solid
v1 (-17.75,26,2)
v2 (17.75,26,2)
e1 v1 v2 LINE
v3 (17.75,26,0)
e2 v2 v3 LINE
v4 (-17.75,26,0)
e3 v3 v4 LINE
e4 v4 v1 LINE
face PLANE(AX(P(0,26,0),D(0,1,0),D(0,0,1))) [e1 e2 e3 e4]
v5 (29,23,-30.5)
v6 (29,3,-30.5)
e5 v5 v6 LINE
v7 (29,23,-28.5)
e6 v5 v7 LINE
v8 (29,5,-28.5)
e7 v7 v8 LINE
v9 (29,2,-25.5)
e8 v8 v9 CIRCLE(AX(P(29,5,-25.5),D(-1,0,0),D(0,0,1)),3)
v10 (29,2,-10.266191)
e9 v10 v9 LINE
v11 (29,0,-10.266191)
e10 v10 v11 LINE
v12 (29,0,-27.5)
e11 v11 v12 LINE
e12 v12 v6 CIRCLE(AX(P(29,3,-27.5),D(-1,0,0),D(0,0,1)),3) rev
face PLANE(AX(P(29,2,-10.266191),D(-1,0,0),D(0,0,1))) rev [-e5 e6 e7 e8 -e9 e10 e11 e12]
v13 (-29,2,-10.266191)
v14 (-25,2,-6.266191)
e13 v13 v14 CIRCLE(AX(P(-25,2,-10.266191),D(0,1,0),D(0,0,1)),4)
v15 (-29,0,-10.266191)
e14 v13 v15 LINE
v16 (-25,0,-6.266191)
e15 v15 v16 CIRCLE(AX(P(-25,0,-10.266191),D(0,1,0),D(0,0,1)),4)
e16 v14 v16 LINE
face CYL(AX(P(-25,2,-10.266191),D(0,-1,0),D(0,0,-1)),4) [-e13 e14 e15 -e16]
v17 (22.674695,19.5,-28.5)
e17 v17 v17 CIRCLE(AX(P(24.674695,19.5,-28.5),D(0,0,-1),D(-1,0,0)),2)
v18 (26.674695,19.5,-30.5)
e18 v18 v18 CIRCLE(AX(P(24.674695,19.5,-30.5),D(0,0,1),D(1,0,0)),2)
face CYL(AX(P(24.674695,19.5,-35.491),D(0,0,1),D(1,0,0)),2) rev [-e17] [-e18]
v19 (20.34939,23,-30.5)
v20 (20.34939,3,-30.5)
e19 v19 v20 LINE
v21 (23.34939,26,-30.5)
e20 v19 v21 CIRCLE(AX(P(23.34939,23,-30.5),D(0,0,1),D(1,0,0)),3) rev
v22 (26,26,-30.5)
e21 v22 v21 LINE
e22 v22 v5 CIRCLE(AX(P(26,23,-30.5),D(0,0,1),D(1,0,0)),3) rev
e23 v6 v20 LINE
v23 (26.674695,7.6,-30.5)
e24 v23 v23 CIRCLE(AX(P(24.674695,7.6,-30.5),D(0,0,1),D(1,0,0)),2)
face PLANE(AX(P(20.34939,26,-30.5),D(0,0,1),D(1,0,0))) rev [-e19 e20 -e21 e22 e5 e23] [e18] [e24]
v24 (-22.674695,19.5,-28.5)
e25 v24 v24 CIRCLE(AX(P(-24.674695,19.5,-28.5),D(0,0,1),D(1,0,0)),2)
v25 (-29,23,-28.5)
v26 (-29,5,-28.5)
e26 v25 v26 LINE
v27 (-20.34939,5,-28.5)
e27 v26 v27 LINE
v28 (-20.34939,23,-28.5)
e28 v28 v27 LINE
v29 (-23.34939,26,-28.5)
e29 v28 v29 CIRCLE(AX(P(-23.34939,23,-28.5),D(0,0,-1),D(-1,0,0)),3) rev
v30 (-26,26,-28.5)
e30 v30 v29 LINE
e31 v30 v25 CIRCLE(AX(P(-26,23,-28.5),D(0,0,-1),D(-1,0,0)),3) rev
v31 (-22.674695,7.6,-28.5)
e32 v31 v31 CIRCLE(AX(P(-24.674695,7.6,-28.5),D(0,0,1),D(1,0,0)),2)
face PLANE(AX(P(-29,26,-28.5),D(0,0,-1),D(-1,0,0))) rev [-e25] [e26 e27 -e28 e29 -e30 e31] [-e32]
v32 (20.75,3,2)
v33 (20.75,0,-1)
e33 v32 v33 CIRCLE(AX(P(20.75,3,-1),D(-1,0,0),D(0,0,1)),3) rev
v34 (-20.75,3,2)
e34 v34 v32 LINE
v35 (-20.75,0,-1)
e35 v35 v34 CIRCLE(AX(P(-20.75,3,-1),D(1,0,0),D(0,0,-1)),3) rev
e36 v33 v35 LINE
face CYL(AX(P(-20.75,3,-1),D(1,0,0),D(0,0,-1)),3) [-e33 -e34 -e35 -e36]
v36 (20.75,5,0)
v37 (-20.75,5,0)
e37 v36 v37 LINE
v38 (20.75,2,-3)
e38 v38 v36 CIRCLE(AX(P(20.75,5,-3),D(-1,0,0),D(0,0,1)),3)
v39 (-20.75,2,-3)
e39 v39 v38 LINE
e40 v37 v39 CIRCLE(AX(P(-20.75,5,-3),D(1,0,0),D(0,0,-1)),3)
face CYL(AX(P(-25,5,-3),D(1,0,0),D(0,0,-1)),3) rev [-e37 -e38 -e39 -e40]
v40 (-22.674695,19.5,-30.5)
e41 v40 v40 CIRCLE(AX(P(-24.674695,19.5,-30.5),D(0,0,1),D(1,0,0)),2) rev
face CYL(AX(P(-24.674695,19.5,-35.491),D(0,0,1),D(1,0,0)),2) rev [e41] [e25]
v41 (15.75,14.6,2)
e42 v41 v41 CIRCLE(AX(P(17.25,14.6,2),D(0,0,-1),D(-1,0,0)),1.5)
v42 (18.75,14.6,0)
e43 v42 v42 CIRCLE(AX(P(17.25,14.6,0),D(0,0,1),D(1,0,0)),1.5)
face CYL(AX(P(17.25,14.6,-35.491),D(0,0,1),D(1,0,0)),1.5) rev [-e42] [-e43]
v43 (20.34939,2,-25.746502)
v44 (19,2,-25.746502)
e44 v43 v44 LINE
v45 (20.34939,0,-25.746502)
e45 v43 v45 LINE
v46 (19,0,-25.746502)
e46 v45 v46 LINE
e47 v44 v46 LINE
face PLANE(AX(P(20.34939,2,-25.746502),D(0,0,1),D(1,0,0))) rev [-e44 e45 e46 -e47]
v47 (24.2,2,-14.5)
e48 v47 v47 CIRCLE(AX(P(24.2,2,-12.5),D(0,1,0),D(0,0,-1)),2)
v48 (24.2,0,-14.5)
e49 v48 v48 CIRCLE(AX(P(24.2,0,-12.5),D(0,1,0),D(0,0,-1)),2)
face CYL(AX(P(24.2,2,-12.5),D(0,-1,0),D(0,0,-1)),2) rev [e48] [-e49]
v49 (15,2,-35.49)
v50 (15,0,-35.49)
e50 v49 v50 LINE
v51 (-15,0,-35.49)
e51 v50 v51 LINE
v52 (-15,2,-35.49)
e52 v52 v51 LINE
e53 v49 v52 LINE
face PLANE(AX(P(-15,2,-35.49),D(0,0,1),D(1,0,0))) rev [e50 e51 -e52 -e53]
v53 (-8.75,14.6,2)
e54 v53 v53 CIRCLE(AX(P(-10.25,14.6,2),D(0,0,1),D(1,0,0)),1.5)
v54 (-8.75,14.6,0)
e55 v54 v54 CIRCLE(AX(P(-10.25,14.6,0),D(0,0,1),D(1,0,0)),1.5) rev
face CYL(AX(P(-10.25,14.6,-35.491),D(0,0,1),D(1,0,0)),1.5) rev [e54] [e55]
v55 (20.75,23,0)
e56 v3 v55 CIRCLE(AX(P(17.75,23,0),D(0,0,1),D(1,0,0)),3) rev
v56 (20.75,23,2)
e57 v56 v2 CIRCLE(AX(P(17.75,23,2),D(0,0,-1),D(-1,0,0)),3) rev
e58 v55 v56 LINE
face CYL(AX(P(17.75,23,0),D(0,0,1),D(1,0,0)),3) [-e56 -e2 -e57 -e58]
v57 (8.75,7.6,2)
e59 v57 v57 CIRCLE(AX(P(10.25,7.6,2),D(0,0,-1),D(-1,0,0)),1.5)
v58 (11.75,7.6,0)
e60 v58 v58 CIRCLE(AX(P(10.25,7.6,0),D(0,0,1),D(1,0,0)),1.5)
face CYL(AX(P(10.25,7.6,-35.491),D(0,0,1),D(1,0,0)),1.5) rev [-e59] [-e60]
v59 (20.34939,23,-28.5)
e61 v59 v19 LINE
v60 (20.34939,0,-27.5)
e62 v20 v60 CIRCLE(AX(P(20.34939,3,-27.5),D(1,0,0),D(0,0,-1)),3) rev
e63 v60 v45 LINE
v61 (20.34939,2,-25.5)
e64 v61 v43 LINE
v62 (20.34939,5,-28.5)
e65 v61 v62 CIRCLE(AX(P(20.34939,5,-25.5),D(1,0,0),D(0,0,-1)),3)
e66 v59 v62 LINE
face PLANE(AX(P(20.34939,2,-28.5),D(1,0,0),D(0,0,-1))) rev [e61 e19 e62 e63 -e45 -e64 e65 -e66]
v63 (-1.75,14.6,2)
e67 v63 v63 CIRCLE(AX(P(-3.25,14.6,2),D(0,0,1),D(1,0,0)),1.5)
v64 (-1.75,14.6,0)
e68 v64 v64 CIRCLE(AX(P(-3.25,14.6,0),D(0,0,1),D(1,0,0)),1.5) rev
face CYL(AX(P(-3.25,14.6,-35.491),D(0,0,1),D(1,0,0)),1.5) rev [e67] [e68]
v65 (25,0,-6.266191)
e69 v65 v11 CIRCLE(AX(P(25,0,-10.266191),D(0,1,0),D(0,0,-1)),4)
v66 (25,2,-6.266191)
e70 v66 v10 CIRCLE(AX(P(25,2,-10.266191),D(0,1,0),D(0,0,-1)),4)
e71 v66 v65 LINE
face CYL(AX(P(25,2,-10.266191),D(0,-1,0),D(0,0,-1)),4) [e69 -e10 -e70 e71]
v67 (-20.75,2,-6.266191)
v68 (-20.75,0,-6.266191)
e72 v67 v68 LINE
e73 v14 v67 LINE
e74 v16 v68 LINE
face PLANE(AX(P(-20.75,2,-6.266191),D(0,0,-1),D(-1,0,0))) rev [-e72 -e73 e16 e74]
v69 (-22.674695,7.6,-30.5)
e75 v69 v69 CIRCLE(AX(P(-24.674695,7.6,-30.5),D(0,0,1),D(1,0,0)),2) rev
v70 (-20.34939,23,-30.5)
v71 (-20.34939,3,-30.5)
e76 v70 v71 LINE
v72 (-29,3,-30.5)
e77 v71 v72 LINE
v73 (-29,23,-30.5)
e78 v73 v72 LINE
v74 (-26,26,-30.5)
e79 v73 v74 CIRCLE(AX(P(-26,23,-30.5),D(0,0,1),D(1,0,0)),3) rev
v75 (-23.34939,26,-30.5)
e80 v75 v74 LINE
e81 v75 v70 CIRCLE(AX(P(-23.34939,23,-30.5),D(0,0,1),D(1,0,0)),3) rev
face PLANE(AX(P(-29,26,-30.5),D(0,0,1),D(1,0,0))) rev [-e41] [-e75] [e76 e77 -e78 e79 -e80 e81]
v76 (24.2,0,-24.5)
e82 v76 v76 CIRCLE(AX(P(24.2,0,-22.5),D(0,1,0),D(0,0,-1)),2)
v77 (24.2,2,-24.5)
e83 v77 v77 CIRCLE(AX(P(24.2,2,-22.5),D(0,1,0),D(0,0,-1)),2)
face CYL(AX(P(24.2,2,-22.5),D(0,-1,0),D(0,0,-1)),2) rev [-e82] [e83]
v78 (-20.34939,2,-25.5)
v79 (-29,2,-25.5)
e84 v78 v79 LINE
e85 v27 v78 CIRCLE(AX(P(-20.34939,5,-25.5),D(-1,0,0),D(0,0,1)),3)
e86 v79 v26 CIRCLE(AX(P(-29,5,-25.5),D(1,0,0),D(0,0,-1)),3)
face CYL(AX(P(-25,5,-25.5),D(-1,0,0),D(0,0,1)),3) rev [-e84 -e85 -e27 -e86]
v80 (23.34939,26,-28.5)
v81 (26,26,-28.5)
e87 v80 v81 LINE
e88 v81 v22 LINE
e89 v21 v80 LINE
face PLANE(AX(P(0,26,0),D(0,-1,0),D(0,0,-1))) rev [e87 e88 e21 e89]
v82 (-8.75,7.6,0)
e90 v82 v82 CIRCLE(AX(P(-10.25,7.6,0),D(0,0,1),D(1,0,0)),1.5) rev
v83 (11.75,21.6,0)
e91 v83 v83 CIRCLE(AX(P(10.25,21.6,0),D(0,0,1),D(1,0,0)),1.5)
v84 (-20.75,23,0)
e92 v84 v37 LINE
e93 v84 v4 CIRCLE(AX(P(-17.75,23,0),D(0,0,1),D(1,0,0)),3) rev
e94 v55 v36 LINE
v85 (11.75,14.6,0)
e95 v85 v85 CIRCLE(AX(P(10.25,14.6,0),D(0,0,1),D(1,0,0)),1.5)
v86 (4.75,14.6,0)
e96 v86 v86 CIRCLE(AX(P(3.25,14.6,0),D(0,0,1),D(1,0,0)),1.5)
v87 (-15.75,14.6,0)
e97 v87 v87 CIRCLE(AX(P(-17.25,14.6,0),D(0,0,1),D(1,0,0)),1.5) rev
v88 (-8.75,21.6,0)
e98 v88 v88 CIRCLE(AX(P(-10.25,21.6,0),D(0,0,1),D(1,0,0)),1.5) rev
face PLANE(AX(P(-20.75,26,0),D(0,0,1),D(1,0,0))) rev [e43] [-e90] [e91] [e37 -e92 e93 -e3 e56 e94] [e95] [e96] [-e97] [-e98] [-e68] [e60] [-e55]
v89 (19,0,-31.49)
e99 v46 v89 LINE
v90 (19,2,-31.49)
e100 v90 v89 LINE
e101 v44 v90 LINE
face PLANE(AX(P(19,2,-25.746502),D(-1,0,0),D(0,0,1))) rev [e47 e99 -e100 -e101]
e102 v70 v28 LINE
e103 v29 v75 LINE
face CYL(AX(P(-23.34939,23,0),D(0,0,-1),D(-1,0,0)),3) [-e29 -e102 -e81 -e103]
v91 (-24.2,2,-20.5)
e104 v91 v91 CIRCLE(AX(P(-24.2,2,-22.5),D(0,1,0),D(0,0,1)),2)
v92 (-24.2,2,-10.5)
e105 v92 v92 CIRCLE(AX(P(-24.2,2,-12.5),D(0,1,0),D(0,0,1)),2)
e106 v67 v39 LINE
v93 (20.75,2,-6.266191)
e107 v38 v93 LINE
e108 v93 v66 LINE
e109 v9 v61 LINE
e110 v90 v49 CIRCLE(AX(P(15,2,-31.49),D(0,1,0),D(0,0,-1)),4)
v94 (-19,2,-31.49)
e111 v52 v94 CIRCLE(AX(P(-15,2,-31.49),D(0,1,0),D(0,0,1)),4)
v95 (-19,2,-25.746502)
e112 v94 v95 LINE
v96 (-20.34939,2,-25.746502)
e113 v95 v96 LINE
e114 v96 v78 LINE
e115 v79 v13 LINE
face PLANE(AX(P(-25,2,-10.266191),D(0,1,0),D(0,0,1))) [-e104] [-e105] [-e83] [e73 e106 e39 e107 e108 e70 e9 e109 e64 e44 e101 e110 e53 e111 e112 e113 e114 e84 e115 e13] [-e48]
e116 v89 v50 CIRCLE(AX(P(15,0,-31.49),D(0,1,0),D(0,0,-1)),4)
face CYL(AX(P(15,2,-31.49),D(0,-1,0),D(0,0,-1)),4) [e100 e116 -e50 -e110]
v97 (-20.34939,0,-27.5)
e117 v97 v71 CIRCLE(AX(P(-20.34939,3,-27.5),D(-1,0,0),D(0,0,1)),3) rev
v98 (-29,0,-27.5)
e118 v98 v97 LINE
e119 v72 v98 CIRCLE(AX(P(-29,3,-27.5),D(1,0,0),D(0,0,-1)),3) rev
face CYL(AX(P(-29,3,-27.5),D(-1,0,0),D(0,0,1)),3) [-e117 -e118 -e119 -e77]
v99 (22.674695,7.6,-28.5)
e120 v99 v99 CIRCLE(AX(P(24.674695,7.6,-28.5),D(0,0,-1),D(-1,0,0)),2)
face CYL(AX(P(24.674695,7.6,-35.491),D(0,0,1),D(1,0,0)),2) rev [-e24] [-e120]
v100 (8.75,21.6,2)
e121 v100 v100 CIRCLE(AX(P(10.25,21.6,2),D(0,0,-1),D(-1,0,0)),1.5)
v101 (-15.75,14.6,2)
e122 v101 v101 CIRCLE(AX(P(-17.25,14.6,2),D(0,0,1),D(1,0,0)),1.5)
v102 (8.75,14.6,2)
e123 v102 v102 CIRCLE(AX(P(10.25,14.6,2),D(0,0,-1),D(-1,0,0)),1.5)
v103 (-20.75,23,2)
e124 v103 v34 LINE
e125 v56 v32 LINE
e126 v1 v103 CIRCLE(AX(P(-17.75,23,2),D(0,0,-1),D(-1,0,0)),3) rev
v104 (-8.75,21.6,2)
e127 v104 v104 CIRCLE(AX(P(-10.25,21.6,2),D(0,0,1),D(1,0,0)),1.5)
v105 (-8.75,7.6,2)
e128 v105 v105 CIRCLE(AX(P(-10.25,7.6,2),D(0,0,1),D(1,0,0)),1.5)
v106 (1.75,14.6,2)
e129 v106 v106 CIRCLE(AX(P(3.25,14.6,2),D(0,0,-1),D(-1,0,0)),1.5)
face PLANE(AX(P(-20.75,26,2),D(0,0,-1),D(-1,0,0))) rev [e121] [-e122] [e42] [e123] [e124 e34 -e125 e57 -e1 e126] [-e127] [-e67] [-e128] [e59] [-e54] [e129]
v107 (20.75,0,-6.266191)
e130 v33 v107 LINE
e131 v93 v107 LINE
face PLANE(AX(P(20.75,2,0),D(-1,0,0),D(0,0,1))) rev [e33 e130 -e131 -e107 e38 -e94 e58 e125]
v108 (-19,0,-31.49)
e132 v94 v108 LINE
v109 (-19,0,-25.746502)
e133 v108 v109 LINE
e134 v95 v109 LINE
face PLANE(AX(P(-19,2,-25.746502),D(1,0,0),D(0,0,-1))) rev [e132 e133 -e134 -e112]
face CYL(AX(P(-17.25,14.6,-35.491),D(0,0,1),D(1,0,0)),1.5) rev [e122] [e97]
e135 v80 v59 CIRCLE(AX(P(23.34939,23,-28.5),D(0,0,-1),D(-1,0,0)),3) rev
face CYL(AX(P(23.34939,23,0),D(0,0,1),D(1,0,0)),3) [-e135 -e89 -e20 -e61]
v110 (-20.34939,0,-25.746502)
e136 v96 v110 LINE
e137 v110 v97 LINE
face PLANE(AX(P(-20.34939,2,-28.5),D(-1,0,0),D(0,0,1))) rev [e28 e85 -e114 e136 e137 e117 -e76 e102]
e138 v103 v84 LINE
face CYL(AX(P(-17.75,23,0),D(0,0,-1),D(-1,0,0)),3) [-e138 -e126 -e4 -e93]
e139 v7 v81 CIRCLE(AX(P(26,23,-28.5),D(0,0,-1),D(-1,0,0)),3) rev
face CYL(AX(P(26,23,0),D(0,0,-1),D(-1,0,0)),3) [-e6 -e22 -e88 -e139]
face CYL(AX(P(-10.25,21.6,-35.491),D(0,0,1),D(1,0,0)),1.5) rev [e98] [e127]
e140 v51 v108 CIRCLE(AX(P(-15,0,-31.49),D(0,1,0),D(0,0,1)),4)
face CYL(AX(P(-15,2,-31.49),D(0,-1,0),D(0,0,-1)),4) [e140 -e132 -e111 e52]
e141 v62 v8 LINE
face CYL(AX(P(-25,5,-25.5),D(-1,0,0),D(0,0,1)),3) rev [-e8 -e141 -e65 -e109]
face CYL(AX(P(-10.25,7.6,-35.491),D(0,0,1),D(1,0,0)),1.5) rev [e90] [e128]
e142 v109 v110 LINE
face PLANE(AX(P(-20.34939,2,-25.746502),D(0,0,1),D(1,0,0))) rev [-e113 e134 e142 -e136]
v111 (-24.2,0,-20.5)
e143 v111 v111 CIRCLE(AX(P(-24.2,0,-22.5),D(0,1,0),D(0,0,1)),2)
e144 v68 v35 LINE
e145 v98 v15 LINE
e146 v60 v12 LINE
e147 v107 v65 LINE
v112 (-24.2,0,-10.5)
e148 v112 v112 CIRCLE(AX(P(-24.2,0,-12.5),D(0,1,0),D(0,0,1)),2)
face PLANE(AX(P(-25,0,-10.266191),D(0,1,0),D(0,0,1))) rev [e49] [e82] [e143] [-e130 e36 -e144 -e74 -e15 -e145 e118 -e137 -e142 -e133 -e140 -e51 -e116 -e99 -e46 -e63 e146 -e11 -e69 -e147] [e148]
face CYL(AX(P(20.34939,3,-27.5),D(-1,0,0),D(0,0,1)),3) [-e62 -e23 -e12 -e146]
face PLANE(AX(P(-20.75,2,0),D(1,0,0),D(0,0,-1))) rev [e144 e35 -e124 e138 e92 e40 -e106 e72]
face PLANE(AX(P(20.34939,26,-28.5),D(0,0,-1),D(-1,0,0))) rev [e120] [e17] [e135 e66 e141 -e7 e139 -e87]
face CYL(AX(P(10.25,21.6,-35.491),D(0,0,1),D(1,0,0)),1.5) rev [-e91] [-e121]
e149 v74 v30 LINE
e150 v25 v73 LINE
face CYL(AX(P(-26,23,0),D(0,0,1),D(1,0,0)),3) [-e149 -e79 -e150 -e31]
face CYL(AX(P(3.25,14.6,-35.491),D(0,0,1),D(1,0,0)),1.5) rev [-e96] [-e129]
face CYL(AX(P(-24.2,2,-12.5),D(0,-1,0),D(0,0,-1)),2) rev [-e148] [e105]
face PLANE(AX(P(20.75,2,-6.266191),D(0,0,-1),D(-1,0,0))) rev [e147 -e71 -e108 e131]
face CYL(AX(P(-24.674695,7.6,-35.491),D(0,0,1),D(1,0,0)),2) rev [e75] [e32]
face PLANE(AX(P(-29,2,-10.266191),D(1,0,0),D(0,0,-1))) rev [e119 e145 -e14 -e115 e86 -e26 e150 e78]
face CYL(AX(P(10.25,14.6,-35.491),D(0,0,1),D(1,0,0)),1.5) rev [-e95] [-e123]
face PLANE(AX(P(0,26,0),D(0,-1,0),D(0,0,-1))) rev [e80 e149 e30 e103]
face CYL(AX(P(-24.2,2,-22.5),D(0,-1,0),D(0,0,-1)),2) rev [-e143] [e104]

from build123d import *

# Parameters (mm, degrees)
SKETCH_1_R          = 2
EXTRUDE_1_DEPTH     = 2
SKETCH_3_W          = 8.650610314
SKETCH_3_H          = 2
SKETCH_3_W_2        = 41.5
EXTRUDE_2_DEPTH     = 26
CUT_EXTRUDE_1_REACH = 51.47
SKETCH_4_R          = 2
CUT_EXTRUDE_2_REACH = 56.06
SKETCH_5_R          = 1.5
FILLET_1_R          = 3


with BuildPart() as part:
    # 草图1 → 凸台-拉伸1 (new body)
    with BuildSketch(Plane(origin=(0, 0, 0), x_dir=(1, 0, 0), z_dir=(0, 1, 0))):
        with BuildLine():
            Line((20.75, 0), (-20.75, 0))
            Line((-20.75, 0), (-20.75, 6.26619118))
            Line((-20.75, 6.26619118), (-25, 6.26619118))
            ThreePointArc((-25, 6.26619118), (-27.828427125, 7.437764055), (-29, 10.26619118))
            Line((-29, 10.26619118), (-29, 28.5))
            Line((-29, 28.5), (-20.349389686, 28.5))
            Line((-20.349389686, 28.5), (-20.349389686, 25.746501866))
            Line((-20.349389686, 25.746501866), (-19, 25.746501866))
            Line((-19, 25.746501866), (-19, 31.49))
            ThreePointArc((-19, 31.49), (-17.828427125, 34.318427125), (-15, 35.49))
            Line((-15, 35.49), (15, 35.49))
            ThreePointArc((15, 35.49), (17.828427125, 34.318427125), (19, 31.49))
            Line((19, 31.49), (19, 25.746501866))
            Line((19, 25.746501866), (20.349389686, 25.746501866))
            Line((20.349389686, 25.746501866), (20.349389686, 28.5))
            Line((20.349389686, 28.5), (29, 28.5))
            Line((29, 28.5), (29, 10.26619118))
            ThreePointArc((29, 10.26619118), (27.828427125, 7.437764055), (25, 6.26619118))
            Line((25, 6.26619118), (20.75, 6.26619118))
            Line((20.75, 6.26619118), (20.75, 0))
        make_face()
        with Locations(Location((-24.2, 22.5, 0), (0, 0, 270))):
            Circle(SKETCH_1_R, mode=Mode.SUBTRACT)
        with Locations(Location((-24.2, 12.5, 0), (0, 0, 270))):
            Circle(SKETCH_1_R, mode=Mode.SUBTRACT)
        with Locations(Location((24.2, 12.5, 0), (0, 0, 90))):
            Circle(SKETCH_1_R, mode=Mode.SUBTRACT)
        with Locations(Location((24.2, 22.5, 0), (0, 0, 90))):
            Circle(SKETCH_1_R, mode=Mode.SUBTRACT)
    extrude(amount=EXTRUDE_1_DEPTH)

    # 草图3 → 凸台-拉伸2 (add)
    with BuildSketch(Plane(origin=(0, 0, 0), x_dir=(1, 0, 0), z_dir=(0, 1, 0))):
        with Locations((-24.674694843, 29.5)):
            Rectangle(SKETCH_3_W, SKETCH_3_H)
        with Locations((24.674694843, 29.5)):
            Rectangle(SKETCH_3_W, SKETCH_3_H)
        with Locations((0, -1)):
            Rectangle(SKETCH_3_W_2, SKETCH_3_H)
    extrude(amount=EXTRUDE_2_DEPTH)

    # 草图4 → 切除-拉伸1 (cut, up to next)
    with BuildSketch(Plane.XY.offset(-28.5), mode=Mode.PRIVATE) as cut_extrude_1_sk1:
        with Locations((-24.674694843, 19.5)):
            Circle(SKETCH_4_R)
    cut_extrude_1_tool1 = extrude(cut_extrude_1_sk1.sketch, amount=-CUT_EXTRUDE_1_REACH, mode=Mode.PRIVATE) & part.part
    # 草图4 → 切除-拉伸1 (cut, up to next)
    with BuildSketch(Plane.XY.offset(-28.5), mode=Mode.PRIVATE) as cut_extrude_1_sk2:
        with Locations((-24.674694843, 7.6)):
            Circle(SKETCH_4_R)
    cut_extrude_1_tool2 = extrude(cut_extrude_1_sk2.sketch, amount=-CUT_EXTRUDE_1_REACH, mode=Mode.PRIVATE) & part.part
    cut_extrude_1_1 = cut_extrude_1_tool1.solids().sort_by_distance((-24.674695, 19.5, -28.5))[0]
    add(cut_extrude_1_1, mode=Mode.SUBTRACT)
    cut_extrude_1_2 = cut_extrude_1_tool2.solids().sort_by_distance((-24.674695, 7.6, -28.5))[0]
    add(cut_extrude_1_2, mode=Mode.SUBTRACT)
    cut_extrude_1 = cut_extrude_1_1 + cut_extrude_1_2  # 切除-拉伸1 as one shape, for the pattern or mirror that repeats it

    # 草图5 → 切除-拉伸2 (cut, up to next)
    with BuildSketch(Plane.XY.offset(2), mode=Mode.PRIVATE) as cut_extrude_2_sk1:
        with Locations((-10.25, 14.6)):
            Circle(SKETCH_5_R)
    cut_extrude_2_tool1 = extrude(cut_extrude_2_sk1.sketch, amount=-CUT_EXTRUDE_2_REACH, mode=Mode.PRIVATE) & part.part
    # 草图5 → 切除-拉伸2 (cut, up to next)
    with BuildSketch(Plane.XY.offset(2), mode=Mode.PRIVATE) as cut_extrude_2_sk2:
        with Locations((-10.25, 21.6)):
            Circle(SKETCH_5_R)
    cut_extrude_2_tool2 = extrude(cut_extrude_2_sk2.sketch, amount=-CUT_EXTRUDE_2_REACH, mode=Mode.PRIVATE) & part.part
    # 草图5 → 切除-拉伸2 (cut, up to next)
    with BuildSketch(Plane.XY.offset(2), mode=Mode.PRIVATE) as cut_extrude_2_sk3:
        with Locations((-3.25, 14.6)):
            Circle(SKETCH_5_R)
    cut_extrude_2_tool3 = extrude(cut_extrude_2_sk3.sketch, amount=-CUT_EXTRUDE_2_REACH, mode=Mode.PRIVATE) & part.part
    # 草图5 → 切除-拉伸2 (cut, up to next)
    with BuildSketch(Plane.XY.offset(2), mode=Mode.PRIVATE) as cut_extrude_2_sk4:
        with Locations((-10.25, 7.6)):
            Circle(SKETCH_5_R)
    cut_extrude_2_tool4 = extrude(cut_extrude_2_sk4.sketch, amount=-CUT_EXTRUDE_2_REACH, mode=Mode.PRIVATE) & part.part
    # 草图5 → 切除-拉伸2 (cut, up to next)
    with BuildSketch(Plane.XY.offset(2), mode=Mode.PRIVATE) as cut_extrude_2_sk5:
        with Locations((-17.25, 14.6)):
            Circle(SKETCH_5_R)
    cut_extrude_2_tool5 = extrude(cut_extrude_2_sk5.sketch, amount=-CUT_EXTRUDE_2_REACH, mode=Mode.PRIVATE) & part.part
    cut_extrude_2_1 = cut_extrude_2_tool1.solids().sort_by_distance((-10.25, 14.6, 2))[0]
    add(cut_extrude_2_1, mode=Mode.SUBTRACT)
    cut_extrude_2_2 = cut_extrude_2_tool2.solids().sort_by_distance((-10.25, 21.6, 2))[0]
    add(cut_extrude_2_2, mode=Mode.SUBTRACT)
    cut_extrude_2_3 = cut_extrude_2_tool3.solids().sort_by_distance((-3.25, 14.6, 2))[0]
    add(cut_extrude_2_3, mode=Mode.SUBTRACT)
    cut_extrude_2_4 = cut_extrude_2_tool4.solids().sort_by_distance((-10.25, 7.6, 2))[0]
    add(cut_extrude_2_4, mode=Mode.SUBTRACT)
    cut_extrude_2_5 = cut_extrude_2_tool5.solids().sort_by_distance((-17.25, 14.6, 2))[0]
    add(cut_extrude_2_5, mode=Mode.SUBTRACT)
    cut_extrude_2 = cut_extrude_2_1 + cut_extrude_2_2 + cut_extrude_2_3 + cut_extrude_2_4 + cut_extrude_2_5  # 切除-拉伸2 as one shape, for the pattern or mirror that repeats it

    # 镜向2: 切除-拉伸1, 切除-拉伸2 across plane
    add(cut_extrude_1.mirror(Plane.ZY), mode=Mode.SUBTRACT)
    add(cut_extrude_2.mirror(Plane.ZY), mode=Mode.SUBTRACT)

    # 圆角1
    # the kernel refuses this fillet: 3 mm, written as the material it adds along each edge
    with BuildSketch(Plane(origin=(20.349389686, 2, -28.5), x_dir=(0, 0, 1), z_dir=(1, 0, 0)), Plane(origin=(-29, 2, -28.5), x_dir=(0, 0, 1), z_dir=(1, 0, 0))) as fillet_1_piece_1:
        with BuildLine():
            CenterArc((FILLET_1_R, -FILLET_1_R), FILLET_1_R, 90, 90)
            Line((0, -FILLET_1_R), (0, 0))
            Line((0, 0), (FILLET_1_R, 0))
        make_face()
    extrude(amount=8.650610314)
    with BuildSketch(Plane(origin=(20.75, 2, 0), x_dir=(0, 0, -1), z_dir=(-1, 0, 0))) as fillet_1_piece_2:
        with BuildLine():
            CenterArc((FILLET_1_R, -FILLET_1_R), FILLET_1_R, 90, 90)
            Line((0, -FILLET_1_R), (0, 0))
            Line((0, 0), (FILLET_1_R, 0))
        make_face()
    extrude(amount=41.5)
    # the kernel refuses this fillet: 3 mm, written as the material it takes off along each edge
    with BuildSketch(Plane(origin=(-12.849389686, 0, -30.5), x_dir=(0, 0, 1), z_dir=(-1, 0, 0))) as fillet_1_2_piece_1_section:
        with BuildLine():
            CenterArc((FILLET_1_R, FILLET_1_R), FILLET_1_R, 180, 90)
            Line((0, FILLET_1_R), (0, 0))
            Line((0, 0), (FILLET_1_R, 0))
        make_face()
    fillet_1_2_piece_1 = extrude(amount=23.650610314, mode=Mode.PRIVATE)
    fillet_1_2_piece_1 = split(fillet_1_2_piece_1, bisect_by=Plane(origin=(-19, 0.622520274, -29.811239081), z_dir=(-1, 0, 0)), keep=Keep.TOP, mode=Mode.PRIVATE)
    add(fillet_1_2_piece_1, mode=Mode.SUBTRACT)
    with BuildSketch(Plane(origin=(-29, 26, -38), x_dir=(0, -1, 0), z_dir=(0, 0, 1)), Plane(origin=(-20.349389686, 26, -21), x_dir=(0, -1, 0), z_dir=(0, 0, -1)), Plane(origin=(20.349389686, 26, -38), x_dir=(0, -1, 0), z_dir=(0, 0, 1)), Plane(origin=(29, 26, -21), x_dir=(0, -1, 0), z_dir=(0, 0, -1)), Plane(origin=(-20.75, 26, 9.5), x_dir=(1, 0, 0), z_dir=(0, 0, -1))) as fillet_1_2_piece_2:
        with BuildLine():
            CenterArc((FILLET_1_R, FILLET_1_R), FILLET_1_R, 180, 90)
            Line((0, FILLET_1_R), (0, 0))
            Line((0, 0), (FILLET_1_R, 0))
        make_face()
    extrude(amount=17, mode=Mode.SUBTRACT)
    with BuildSketch(Plane(origin=(36.5, 0, -30.5), x_dir=(0, 0, 1), z_dir=(-1, 0, 0))) as fillet_1_2_piece_3:
        with BuildLine():
            CenterArc((FILLET_1_R, FILLET_1_R), FILLET_1_R, 180, 90)
            Line((0, FILLET_1_R), (0, 0))
            Line((0, 0), (FILLET_1_R, 0))
        make_face()
    extrude(amount=16.150610314, mode=Mode.SUBTRACT)
    with BuildSketch(Plane(origin=(28.25, 0, 2), x_dir=(0, 0, -1), z_dir=(-1, 0, 0))) as fillet_1_2_piece_4:
        with BuildLine():
            CenterArc((FILLET_1_R, -FILLET_1_R), FILLET_1_R, 90, 90)
            Line((0, -FILLET_1_R), (0, 0))
            Line((0, 0), (FILLET_1_R, 0))
        make_face()
    extrude(amount=56.5, mode=Mode.SUBTRACT)
    with BuildSketch(Plane(origin=(20.75, 26, -7.5), x_dir=(0, -1, 0), z_dir=(0, 0, 1))) as fillet_1_2_piece_5:
        with BuildLine():
            CenterArc((FILLET_1_R, -FILLET_1_R), FILLET_1_R, 90, 90)
            Line((0, -FILLET_1_R), (0, 0))
            Line((0, 0), (FILLET_1_R, 0))
        make_face()
    extrude(amount=17, mode=Mode.SUBTRACT)


solid = part.part
